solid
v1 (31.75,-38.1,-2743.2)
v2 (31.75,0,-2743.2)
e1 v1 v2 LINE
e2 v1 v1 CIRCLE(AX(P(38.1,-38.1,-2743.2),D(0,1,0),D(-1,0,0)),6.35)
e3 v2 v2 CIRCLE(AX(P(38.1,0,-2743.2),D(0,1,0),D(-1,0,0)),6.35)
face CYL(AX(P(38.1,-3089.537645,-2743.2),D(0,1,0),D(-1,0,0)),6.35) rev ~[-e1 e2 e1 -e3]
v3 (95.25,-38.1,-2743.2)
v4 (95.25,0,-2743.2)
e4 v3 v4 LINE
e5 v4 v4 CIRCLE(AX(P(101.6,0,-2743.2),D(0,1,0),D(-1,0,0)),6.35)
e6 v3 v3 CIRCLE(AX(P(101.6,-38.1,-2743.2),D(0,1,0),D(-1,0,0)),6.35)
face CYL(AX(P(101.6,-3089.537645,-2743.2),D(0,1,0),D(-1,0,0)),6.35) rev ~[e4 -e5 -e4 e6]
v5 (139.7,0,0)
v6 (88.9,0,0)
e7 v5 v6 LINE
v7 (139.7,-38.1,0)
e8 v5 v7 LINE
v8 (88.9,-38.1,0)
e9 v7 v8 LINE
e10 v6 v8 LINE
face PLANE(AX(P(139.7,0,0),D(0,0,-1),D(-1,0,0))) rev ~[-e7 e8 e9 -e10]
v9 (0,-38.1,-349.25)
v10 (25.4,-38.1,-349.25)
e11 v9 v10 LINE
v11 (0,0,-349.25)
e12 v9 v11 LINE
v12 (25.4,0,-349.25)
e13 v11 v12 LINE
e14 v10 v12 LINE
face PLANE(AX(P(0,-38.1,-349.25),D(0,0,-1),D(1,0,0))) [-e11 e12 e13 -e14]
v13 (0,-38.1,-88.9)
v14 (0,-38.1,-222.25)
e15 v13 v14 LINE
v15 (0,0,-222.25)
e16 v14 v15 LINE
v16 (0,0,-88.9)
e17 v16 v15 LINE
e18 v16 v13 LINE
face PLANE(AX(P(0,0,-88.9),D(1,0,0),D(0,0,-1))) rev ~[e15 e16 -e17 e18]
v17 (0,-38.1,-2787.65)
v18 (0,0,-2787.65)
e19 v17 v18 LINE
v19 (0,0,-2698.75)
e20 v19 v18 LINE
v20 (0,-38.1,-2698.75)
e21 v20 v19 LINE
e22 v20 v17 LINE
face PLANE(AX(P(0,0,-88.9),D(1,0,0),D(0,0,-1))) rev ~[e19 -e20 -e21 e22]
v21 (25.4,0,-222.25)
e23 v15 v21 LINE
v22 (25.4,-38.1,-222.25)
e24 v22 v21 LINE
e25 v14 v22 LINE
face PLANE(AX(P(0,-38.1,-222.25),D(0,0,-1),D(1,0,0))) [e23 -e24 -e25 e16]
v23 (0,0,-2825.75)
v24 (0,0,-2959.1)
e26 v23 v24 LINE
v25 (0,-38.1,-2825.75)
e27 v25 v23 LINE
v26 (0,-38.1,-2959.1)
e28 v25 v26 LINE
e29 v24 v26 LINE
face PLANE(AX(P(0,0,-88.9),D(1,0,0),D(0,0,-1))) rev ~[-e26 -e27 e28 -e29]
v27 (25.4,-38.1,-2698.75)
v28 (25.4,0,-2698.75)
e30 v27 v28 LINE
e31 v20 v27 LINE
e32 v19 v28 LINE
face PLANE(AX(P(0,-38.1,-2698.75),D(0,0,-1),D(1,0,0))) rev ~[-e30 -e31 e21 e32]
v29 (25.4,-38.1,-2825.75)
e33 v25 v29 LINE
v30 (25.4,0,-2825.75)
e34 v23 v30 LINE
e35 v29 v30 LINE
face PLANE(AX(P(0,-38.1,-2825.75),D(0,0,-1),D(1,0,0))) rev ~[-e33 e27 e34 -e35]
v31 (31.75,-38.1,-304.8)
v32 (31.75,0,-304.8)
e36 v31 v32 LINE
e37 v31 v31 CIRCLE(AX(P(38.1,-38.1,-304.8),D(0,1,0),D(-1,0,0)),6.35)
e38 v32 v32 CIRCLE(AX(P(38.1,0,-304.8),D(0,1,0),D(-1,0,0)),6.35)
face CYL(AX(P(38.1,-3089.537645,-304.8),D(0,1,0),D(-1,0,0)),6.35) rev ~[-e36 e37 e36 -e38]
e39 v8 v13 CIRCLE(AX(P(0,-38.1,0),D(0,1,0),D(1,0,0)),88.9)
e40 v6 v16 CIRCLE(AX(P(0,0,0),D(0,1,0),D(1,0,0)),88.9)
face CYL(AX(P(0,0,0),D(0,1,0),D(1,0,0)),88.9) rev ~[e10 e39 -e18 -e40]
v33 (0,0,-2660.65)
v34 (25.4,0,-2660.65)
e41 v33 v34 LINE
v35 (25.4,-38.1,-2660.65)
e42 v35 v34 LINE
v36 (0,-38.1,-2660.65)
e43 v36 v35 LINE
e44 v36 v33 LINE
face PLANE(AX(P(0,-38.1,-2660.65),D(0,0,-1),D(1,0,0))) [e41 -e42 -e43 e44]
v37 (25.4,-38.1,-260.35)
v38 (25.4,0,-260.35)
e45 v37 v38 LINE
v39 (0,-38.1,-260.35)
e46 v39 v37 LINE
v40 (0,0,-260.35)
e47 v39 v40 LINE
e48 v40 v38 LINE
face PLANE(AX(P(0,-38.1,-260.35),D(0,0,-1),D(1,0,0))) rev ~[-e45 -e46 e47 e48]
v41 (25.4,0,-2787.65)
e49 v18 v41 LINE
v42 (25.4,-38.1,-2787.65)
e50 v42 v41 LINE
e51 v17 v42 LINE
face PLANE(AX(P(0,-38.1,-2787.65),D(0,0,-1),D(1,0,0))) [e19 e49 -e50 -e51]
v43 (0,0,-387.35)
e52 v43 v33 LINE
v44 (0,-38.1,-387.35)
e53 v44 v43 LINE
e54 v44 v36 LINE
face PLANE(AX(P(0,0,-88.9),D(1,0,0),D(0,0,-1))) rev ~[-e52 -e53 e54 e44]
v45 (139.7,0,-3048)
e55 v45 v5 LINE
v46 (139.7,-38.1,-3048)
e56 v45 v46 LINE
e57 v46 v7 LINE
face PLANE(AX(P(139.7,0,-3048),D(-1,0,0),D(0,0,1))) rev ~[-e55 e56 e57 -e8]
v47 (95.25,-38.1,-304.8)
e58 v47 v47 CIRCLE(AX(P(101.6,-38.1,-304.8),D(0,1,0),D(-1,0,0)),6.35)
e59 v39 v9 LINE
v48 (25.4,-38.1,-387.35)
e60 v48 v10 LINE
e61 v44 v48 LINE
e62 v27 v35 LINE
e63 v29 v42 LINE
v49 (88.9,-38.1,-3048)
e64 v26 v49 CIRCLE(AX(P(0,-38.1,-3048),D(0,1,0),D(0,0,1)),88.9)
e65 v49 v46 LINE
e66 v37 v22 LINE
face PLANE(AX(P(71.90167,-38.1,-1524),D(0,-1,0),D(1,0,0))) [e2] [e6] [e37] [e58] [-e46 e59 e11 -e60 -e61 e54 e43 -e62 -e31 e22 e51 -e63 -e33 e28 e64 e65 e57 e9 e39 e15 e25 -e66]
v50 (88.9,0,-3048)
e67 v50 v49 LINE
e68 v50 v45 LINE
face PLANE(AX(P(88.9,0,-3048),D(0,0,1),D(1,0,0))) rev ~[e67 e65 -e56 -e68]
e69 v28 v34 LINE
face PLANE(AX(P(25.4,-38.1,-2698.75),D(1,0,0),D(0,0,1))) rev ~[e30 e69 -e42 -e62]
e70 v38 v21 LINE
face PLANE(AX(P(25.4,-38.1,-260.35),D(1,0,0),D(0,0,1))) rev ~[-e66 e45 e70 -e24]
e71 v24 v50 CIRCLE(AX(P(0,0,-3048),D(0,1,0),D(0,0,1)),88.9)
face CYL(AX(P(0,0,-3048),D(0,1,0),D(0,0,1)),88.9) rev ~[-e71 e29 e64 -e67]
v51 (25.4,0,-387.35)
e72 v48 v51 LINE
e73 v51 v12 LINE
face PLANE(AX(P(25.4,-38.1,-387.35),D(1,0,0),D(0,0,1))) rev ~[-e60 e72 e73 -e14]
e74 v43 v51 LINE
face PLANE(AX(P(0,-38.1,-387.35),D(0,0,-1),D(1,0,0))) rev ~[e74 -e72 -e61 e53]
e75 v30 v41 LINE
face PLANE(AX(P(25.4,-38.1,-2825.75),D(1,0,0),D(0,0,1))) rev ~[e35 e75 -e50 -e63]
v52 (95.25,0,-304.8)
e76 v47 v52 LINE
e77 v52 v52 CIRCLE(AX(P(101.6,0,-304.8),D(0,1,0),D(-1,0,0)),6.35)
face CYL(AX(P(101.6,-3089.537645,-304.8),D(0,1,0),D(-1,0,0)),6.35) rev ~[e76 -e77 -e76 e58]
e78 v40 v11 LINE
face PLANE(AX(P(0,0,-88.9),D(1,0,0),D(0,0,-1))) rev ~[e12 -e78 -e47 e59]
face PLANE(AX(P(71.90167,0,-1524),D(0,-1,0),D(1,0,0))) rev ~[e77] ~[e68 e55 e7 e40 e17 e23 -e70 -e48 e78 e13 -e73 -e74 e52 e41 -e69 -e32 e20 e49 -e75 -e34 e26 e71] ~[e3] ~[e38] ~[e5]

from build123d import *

# Parameters (mm, degrees)
F1_DEPTH = 38.1
F3_D     = 12.7
F4_W     = 25.4
F4_H     = 38.1
F5_DEPTH = 38.101


# Not quite as in the source:
# - a length typed as a fraction of an inch, garbled in the dataset ("3 / 203.2 mm" for 3/8 in), is restored


with BuildPart() as f1:
    # F0 (on Front) → F1 (new body)
    with BuildSketch(Plane.XZ):
        with BuildLine():
            ThreePointArc((88.9, 0), (62.8617928475, -62.8617928475), (0, -88.9))
            Line((0, -88.9), (0, -2959.1))
            ThreePointArc((0, -2959.1), (62.8617928475, -2985.1382071525), (88.9, -3048))
            Line((88.9, -3048), (139.7, -3048))
            Line((139.7, -3048), (139.7, 0))
            Line((139.7, 0), (88.9, 0))
        make_face()
    extrude(amount=F1_DEPTH)

    # F3 (through all)
    with Locations(Plane.XZ.offset(38.1)):
        with Locations((38.1, -2743.2), (101.6, -2743.2), (38.1, -304.8), (101.6, -304.8)):
            Hole(F3_D / 2)

    # F4 (on face) → F5 (cut, through all)
    with BuildSketch(Plane.XZ.offset(38.1)):
        with Locations((12.7, -241.3)):
            Rectangle(F4_W, F4_H)
        with Locations((12.7, -368.3)):
            Rectangle(F4_W, F4_H)
        with Locations((12.7, -2679.7)):
            Rectangle(F4_W, F4_H)
        with Locations((12.7, -2806.7)):
            Rectangle(F4_W, F4_H)
    extrude(amount=-F5_DEPTH, mode=Mode.SUBTRACT)


solid = f1.part
